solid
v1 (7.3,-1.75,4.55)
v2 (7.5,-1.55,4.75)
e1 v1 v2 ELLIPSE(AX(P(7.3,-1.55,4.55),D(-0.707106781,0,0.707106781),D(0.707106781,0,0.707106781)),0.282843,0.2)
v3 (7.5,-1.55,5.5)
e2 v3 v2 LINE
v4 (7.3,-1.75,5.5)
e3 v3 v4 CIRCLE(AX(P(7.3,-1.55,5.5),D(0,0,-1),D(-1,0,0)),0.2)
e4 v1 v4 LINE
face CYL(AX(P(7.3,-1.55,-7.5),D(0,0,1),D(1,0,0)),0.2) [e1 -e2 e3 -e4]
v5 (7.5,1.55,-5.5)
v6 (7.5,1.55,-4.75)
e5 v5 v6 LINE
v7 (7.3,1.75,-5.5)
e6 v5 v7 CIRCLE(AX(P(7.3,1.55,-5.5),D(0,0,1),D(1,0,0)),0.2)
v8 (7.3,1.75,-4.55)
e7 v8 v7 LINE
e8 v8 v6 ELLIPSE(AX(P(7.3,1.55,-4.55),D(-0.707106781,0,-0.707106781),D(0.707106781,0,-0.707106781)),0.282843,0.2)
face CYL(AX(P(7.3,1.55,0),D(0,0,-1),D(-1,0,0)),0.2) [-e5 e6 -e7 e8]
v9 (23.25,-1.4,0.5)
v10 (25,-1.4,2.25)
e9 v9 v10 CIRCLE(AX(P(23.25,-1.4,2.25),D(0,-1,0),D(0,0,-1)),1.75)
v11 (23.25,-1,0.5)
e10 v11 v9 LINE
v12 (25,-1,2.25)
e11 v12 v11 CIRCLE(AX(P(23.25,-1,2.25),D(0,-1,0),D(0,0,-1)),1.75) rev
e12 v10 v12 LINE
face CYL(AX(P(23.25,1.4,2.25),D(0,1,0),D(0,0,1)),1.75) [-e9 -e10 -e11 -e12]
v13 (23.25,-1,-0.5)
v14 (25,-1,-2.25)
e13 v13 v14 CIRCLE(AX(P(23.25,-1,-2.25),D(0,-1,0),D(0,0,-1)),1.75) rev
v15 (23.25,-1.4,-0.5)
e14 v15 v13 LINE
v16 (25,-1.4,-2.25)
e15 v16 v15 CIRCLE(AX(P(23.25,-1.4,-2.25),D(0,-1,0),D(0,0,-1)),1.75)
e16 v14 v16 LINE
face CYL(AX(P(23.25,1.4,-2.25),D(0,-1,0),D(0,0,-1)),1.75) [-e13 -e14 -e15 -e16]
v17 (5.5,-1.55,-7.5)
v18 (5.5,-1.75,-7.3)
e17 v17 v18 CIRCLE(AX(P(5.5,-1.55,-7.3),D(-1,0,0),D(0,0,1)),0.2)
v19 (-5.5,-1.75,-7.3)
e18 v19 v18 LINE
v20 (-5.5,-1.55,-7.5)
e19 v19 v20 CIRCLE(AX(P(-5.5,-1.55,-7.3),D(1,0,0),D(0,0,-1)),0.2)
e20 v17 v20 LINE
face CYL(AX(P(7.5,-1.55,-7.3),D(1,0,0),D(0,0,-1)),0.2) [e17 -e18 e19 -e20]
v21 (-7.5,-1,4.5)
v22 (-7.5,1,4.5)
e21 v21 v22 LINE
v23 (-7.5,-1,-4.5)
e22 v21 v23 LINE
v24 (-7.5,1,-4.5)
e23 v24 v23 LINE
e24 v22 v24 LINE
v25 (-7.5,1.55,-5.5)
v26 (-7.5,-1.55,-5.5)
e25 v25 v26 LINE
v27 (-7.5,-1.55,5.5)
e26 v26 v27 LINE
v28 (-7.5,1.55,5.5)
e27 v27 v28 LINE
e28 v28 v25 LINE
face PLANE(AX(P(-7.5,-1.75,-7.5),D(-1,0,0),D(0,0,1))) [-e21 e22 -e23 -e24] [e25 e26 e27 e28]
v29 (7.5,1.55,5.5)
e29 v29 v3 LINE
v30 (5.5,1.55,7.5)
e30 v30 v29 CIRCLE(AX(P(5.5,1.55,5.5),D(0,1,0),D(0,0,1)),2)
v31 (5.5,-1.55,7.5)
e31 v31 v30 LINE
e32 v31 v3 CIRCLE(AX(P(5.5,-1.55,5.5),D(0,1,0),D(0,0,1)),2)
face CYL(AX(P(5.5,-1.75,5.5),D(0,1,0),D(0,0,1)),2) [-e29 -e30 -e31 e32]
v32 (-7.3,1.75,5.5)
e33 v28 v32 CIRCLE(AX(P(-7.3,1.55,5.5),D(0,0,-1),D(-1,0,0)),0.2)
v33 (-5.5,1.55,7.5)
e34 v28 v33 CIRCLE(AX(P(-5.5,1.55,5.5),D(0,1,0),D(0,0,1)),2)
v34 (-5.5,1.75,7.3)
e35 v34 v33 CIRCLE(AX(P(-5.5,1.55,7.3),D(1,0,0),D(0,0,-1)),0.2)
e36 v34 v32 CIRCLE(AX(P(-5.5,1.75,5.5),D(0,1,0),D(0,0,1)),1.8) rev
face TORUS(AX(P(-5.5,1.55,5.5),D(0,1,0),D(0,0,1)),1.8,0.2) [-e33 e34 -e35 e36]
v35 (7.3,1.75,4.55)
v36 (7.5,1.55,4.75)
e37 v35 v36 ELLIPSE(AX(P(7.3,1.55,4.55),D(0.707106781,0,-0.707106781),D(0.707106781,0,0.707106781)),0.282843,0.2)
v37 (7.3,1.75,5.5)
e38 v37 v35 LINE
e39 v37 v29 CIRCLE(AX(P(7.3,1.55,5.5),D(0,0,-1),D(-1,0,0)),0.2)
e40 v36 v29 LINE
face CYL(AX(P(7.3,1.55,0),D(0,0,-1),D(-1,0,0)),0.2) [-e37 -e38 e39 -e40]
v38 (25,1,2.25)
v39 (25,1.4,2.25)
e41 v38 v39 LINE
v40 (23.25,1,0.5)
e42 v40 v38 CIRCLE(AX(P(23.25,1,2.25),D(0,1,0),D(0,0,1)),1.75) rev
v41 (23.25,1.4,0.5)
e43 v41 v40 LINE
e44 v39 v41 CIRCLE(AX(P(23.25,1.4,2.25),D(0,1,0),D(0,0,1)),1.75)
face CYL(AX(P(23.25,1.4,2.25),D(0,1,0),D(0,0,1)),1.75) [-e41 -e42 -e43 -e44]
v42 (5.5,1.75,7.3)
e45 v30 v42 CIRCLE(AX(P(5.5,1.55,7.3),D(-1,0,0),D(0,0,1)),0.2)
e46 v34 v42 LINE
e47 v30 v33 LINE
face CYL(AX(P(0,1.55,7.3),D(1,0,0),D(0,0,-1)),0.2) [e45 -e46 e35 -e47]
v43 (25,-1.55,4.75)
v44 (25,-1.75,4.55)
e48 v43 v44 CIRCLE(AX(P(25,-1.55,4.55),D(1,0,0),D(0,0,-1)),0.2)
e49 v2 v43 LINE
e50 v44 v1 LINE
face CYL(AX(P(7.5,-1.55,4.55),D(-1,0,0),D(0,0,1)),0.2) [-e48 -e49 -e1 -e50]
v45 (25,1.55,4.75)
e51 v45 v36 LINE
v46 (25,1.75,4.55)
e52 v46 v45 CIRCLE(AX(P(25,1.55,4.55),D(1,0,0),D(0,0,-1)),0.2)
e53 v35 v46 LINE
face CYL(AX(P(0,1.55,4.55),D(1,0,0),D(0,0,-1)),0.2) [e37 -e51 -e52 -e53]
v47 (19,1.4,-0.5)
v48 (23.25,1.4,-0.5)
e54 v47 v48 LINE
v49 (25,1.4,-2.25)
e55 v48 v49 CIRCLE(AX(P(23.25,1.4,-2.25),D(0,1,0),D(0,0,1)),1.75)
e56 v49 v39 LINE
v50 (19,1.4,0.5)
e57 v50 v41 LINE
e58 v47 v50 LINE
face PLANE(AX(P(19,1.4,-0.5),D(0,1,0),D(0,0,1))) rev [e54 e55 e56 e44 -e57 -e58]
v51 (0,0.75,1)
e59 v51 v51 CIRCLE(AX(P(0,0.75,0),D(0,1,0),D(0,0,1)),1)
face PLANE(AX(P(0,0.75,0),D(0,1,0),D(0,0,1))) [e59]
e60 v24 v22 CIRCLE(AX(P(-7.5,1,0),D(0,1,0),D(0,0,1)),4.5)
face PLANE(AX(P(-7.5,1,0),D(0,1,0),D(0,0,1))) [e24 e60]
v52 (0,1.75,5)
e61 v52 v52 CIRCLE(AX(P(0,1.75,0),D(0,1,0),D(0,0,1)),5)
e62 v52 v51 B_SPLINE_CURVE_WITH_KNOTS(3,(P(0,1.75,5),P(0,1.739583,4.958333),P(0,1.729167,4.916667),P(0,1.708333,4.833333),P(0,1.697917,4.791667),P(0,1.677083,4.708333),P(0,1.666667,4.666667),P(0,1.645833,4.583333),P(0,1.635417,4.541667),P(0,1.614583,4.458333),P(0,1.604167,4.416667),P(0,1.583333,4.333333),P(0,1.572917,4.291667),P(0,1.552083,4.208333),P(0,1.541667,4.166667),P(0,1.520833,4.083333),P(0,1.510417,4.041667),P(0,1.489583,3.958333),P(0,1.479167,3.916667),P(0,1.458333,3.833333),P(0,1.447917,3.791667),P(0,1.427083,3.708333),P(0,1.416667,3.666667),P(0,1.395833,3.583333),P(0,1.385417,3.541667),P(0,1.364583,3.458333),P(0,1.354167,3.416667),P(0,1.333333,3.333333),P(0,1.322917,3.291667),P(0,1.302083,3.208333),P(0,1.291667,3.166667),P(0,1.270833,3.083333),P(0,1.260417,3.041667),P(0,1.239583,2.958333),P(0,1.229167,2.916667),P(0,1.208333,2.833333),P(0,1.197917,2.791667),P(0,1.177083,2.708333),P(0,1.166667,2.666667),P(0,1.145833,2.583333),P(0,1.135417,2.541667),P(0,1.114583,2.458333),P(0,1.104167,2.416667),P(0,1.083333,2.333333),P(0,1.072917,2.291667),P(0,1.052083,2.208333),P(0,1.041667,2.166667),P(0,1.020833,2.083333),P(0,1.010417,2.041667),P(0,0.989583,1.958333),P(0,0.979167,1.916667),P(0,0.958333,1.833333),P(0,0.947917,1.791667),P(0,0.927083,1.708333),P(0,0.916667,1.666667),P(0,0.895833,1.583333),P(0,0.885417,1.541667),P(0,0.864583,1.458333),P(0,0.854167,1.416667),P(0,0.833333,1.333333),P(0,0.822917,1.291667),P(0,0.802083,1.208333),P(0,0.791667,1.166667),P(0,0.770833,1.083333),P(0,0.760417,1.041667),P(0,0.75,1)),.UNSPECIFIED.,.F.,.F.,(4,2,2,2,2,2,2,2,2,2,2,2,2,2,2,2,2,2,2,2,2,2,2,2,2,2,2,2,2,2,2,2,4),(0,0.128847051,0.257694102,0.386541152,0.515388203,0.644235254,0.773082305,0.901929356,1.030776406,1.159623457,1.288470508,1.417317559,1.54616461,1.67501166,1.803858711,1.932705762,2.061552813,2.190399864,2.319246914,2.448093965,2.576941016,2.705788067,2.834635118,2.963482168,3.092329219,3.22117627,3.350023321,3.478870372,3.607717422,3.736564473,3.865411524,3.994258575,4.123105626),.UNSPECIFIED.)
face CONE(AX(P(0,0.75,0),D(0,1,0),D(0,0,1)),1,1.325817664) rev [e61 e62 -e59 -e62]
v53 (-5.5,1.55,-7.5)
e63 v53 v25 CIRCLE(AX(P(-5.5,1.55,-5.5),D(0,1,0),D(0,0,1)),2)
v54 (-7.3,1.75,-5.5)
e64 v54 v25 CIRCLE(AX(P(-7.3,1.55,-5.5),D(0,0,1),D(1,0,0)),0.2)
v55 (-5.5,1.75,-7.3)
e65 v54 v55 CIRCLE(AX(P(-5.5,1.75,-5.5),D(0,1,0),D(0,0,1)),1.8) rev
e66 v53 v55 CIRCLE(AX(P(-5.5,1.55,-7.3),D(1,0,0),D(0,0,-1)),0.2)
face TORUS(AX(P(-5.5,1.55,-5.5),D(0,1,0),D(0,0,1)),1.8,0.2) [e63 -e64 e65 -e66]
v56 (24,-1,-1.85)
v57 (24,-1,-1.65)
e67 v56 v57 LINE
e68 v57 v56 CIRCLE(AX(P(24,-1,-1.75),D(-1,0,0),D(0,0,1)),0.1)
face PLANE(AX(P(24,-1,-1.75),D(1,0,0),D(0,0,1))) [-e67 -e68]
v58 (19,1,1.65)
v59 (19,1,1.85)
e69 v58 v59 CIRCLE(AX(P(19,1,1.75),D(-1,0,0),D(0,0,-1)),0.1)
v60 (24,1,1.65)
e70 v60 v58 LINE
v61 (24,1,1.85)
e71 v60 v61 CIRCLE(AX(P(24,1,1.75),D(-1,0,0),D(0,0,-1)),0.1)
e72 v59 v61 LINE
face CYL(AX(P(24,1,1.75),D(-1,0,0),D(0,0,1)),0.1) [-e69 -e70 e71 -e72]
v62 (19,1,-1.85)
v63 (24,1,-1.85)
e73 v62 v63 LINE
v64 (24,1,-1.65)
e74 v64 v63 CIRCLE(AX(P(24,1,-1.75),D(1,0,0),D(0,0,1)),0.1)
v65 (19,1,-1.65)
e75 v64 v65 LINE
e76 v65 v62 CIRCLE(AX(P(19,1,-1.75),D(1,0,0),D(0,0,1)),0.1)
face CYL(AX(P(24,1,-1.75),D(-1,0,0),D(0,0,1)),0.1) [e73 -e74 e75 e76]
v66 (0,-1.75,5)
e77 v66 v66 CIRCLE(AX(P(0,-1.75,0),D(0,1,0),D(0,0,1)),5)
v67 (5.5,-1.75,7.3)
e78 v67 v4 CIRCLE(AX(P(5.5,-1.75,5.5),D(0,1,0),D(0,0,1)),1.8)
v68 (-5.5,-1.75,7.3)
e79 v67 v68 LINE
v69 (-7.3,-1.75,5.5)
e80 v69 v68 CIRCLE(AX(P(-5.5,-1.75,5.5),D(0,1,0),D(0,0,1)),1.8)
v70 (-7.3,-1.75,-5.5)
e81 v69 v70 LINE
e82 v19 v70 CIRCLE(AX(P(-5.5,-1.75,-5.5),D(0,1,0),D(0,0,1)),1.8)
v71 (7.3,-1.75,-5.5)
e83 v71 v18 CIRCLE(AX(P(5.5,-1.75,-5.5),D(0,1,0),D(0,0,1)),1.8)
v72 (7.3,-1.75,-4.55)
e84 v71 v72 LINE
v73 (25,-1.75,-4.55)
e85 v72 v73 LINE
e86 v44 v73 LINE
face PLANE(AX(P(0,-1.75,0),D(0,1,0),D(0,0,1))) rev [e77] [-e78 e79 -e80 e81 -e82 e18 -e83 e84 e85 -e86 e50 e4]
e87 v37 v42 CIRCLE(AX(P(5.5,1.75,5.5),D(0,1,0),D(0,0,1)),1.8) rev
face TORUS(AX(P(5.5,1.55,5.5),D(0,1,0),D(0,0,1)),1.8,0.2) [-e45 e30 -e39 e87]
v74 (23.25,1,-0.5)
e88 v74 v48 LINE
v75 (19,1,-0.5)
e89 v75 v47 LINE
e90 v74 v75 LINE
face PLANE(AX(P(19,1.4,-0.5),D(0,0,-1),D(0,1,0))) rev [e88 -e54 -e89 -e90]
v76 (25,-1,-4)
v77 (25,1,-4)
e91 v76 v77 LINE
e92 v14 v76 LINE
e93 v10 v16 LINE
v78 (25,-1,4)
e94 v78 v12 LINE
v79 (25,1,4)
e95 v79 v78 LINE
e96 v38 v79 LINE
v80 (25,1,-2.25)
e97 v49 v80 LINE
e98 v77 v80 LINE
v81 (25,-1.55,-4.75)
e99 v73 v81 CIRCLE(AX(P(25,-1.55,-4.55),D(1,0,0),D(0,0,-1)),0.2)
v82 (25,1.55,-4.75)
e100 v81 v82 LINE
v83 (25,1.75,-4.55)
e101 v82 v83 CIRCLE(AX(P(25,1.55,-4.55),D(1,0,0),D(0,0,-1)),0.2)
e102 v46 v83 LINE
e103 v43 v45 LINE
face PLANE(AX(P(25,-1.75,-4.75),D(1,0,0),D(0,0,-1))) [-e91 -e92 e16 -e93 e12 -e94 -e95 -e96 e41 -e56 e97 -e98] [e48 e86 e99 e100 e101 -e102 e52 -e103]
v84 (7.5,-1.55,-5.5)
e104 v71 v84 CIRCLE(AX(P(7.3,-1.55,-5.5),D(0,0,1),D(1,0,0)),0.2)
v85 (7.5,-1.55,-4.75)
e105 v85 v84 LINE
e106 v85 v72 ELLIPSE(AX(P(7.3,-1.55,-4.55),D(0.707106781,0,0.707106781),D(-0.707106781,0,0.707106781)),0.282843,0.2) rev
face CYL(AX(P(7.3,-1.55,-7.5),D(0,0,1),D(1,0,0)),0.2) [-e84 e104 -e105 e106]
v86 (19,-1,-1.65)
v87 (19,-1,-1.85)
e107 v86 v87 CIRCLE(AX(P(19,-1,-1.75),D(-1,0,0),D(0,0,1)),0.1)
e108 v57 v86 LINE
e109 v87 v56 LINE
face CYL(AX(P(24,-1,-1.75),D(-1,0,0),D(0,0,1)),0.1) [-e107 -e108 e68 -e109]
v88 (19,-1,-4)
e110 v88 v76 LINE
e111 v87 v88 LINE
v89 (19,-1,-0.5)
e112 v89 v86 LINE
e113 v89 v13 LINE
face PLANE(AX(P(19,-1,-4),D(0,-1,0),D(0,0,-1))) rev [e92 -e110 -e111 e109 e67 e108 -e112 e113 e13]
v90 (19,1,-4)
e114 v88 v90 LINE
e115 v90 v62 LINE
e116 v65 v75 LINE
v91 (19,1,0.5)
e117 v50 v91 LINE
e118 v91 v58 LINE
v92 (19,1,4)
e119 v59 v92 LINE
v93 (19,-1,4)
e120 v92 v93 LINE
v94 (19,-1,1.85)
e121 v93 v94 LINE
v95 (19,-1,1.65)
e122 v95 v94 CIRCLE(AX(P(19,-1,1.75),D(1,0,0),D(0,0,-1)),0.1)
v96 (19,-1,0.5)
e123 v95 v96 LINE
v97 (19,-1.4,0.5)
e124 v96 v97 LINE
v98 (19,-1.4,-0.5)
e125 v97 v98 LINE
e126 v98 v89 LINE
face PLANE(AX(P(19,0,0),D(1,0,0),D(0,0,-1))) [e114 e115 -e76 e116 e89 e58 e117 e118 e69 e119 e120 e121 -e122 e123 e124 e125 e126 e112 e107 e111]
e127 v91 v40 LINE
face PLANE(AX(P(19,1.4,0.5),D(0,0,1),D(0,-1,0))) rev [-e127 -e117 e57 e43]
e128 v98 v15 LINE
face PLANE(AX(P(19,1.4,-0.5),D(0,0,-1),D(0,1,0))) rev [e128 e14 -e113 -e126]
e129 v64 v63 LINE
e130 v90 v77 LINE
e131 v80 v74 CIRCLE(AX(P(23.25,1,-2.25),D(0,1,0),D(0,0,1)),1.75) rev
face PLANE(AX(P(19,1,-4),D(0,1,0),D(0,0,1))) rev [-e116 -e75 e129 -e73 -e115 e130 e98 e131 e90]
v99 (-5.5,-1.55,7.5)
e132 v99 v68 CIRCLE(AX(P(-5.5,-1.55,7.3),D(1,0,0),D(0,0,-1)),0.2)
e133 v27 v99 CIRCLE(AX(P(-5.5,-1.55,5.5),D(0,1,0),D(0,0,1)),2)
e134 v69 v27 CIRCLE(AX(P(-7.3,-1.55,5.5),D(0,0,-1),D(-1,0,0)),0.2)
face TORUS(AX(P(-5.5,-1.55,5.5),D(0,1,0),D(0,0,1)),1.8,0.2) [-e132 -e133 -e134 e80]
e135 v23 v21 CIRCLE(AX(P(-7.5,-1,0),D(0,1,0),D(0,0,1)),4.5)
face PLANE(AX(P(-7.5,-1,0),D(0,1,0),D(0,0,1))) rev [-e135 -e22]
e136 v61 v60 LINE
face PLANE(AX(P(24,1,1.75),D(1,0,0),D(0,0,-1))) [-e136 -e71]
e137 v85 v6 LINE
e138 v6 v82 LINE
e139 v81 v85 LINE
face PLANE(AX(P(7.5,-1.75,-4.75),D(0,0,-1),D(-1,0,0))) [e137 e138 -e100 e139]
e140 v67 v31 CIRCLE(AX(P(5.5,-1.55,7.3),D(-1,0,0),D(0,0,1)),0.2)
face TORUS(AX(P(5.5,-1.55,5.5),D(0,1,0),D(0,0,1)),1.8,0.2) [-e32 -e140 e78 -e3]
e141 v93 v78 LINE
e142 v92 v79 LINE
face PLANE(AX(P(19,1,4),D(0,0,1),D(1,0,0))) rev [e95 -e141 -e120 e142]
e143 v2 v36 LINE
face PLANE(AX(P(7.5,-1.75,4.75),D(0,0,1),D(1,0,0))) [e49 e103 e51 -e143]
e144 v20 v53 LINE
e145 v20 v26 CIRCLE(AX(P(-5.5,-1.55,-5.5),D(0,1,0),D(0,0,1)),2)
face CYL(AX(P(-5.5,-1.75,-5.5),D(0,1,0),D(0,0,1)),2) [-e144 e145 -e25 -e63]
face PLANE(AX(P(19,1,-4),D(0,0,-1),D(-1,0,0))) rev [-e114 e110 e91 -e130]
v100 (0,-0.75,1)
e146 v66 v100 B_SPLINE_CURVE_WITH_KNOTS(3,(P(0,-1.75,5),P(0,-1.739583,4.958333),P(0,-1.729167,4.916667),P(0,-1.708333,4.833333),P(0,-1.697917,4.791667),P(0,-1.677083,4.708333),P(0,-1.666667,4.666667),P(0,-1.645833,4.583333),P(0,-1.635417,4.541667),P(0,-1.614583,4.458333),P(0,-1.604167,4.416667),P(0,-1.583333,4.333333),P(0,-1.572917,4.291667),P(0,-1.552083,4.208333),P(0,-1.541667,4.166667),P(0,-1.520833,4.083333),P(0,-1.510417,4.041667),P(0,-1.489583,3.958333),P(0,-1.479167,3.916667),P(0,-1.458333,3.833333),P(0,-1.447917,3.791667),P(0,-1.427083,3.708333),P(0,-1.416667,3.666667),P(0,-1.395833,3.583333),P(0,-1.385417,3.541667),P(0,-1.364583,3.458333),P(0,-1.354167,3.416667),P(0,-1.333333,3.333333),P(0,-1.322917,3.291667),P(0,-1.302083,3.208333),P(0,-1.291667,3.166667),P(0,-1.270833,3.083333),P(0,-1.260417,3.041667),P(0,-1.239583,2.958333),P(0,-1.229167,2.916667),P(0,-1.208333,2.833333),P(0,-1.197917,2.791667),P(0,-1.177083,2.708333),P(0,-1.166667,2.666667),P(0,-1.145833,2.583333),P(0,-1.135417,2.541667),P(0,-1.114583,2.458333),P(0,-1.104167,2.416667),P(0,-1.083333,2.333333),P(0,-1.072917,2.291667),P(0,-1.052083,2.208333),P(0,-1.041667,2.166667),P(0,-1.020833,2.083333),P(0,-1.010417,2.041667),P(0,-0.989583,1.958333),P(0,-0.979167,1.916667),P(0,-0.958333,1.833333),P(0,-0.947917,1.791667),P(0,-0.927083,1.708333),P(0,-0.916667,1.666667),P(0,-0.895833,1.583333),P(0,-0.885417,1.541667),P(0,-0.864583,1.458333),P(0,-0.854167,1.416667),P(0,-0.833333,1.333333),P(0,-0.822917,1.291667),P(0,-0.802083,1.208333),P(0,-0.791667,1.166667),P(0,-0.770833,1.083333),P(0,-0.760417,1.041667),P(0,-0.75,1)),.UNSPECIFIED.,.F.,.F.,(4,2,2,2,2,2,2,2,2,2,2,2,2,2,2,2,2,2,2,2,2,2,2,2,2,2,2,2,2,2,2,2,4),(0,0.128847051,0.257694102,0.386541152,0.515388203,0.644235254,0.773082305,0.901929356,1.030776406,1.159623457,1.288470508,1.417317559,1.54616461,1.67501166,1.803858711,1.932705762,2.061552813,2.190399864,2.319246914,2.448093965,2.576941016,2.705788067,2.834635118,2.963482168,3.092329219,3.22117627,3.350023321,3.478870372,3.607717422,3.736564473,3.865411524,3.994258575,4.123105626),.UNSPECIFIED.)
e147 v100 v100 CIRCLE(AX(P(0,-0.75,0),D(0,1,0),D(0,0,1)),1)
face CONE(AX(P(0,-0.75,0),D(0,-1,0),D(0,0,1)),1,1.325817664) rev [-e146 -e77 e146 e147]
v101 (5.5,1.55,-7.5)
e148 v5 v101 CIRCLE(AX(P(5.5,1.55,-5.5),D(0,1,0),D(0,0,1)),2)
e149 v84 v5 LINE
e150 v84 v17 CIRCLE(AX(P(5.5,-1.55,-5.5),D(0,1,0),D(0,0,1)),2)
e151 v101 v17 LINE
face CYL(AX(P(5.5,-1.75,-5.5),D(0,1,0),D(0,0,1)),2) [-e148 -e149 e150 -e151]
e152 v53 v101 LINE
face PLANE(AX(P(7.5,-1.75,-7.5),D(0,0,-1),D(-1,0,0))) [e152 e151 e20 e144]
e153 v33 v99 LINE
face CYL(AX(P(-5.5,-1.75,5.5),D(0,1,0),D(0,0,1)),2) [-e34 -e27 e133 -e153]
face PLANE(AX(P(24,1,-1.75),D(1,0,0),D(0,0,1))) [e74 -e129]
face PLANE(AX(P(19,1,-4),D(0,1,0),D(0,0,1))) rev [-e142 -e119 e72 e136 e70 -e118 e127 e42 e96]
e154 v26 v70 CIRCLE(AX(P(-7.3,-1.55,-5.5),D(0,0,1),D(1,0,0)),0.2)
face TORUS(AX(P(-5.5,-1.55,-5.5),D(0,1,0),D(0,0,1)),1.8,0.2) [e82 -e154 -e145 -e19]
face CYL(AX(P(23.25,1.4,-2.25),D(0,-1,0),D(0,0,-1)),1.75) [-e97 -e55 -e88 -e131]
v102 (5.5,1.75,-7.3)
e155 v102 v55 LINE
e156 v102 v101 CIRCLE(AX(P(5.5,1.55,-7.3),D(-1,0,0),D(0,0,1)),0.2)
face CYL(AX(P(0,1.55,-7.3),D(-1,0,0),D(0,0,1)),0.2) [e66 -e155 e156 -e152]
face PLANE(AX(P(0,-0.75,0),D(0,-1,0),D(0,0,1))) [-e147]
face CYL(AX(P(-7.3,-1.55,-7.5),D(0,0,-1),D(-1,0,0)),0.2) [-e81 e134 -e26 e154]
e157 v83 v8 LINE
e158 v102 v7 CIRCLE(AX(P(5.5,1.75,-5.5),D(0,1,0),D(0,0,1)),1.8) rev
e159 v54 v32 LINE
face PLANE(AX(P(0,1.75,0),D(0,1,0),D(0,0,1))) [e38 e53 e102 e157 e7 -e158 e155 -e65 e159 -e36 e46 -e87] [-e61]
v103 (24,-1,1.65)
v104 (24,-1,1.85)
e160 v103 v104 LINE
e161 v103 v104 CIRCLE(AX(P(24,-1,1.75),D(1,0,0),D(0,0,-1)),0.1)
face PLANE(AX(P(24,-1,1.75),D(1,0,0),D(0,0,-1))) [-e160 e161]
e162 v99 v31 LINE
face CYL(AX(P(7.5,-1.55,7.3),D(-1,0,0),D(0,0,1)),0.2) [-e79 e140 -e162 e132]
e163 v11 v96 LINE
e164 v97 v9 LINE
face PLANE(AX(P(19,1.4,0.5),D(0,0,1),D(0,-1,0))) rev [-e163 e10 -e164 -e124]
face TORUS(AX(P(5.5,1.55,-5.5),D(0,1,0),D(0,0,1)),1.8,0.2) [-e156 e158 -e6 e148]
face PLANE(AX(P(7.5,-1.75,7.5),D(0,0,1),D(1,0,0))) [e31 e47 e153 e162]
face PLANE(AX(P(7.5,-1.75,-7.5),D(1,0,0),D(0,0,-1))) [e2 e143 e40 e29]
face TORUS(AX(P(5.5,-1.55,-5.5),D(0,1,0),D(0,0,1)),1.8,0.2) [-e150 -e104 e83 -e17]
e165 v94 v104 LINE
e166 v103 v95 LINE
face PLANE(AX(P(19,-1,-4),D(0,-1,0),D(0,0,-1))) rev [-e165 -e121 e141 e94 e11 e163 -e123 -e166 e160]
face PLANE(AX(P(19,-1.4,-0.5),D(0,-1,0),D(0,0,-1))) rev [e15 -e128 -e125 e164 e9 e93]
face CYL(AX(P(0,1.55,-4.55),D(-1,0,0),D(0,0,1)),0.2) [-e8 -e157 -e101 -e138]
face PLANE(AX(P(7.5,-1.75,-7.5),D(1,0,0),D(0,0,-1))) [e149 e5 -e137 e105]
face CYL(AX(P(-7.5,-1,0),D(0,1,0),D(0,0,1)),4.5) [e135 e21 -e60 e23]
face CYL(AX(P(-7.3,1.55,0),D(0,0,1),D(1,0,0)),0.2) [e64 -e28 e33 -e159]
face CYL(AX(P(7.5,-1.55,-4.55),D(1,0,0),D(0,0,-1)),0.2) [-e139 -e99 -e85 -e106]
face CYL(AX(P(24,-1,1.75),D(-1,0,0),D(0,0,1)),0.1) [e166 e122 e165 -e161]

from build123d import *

# Parameters (mm, degrees)
EXTRUDE_1_DEPTH          = 1.75
EXTRUDE_1_DEPTH_BACK     = 1.75
SKETCH_1_W               = 15
SKETCH_1_H               = 15
EXTRUDE_2_DEPTH          = 1
EXTRUDE_2_DEPTH_BACK     = 1
SKETCH_2_R               = 4.5
EXTRUDE_3_DEPTH          = 1.75
EXTRUDE_3_DEPTH_BACK     = 1.75
SKETCH_3_W               = 17.5
SKETCH_3_H               = 9.5
SKETCH_4_R               = 5
SKETCH_5_R               = 1
SKETCH_6_W               = 8
SKETCH_6_H               = 2
CUT_EXTRUDE_1_DEPTH      = 6
SKETCH_7_W               = 1
SKETCH_7_H               = 2.8
CUT_EXTRUDE_2_DEPTH      = 6
SKETCH_8_R               = 0.1
EXTRUDE_4_DEPTH          = 5
MIRROR_3_COPY_1_SKETCH_R = 0.1
MIRROR_3_COPY_1_DEPTH    = 5
FILLET_1_R               = 1.75
FILLET_2_R               = 0.2
FILLET_3_R               = 2


with BuildPart() as part:
    # 草图1 → 凸台-拉伸1 (new, two sides: drawn at the far end of the back side and taken through both)
    with BuildSketch(Plane(origin=(0, 0, 0), x_dir=(1, 0, 0), z_dir=(0, 1, 0)).offset(-EXTRUDE_1_DEPTH_BACK)):
        Rectangle(SKETCH_1_W, SKETCH_1_H)
    extrude(amount=EXTRUDE_1_DEPTH + EXTRUDE_1_DEPTH_BACK)

    # 草图2 → 凸台-拉伸2 (add, two sides: drawn at the far end of the back side and taken through both)
    with BuildSketch(Plane(origin=(0, 0, 0), x_dir=(1, 0, 0), z_dir=(0, 1, 0)).offset(-EXTRUDE_2_DEPTH_BACK)):
        with Locations((-7.5, 0)):
            Circle(SKETCH_2_R)
    extrude(amount=EXTRUDE_2_DEPTH + EXTRUDE_2_DEPTH_BACK)

    # 草图3 → 凸台-拉伸3 (add, two sides: drawn at the far end of the back side and taken through both)
    with BuildSketch(Plane(origin=(0, 0, 0), x_dir=(1, 0, 0), z_dir=(0, 1, 0)).offset(-EXTRUDE_3_DEPTH_BACK)):
        with Locations((16.25, 0)):
            Rectangle(SKETCH_3_W, SKETCH_3_H)
    extrude(amount=EXTRUDE_3_DEPTH + EXTRUDE_3_DEPTH_BACK)

    # 草图4 → 切除-放样1 section 0
    with BuildSketch(Plane(origin=(0, 1.75, 0), x_dir=(1, 0, 0), z_dir=(0, 1, 0))):
        Circle(SKETCH_4_R)
    # 草图5 → 切除-放样1 section 1
    with BuildSketch(Plane(origin=(0, 0.75, 0), x_dir=(1, 0, 0), z_dir=(0, 1, 0))):
        Circle(SKETCH_5_R)
    loft_1 = loft(mode=Mode.SUBTRACT)

    # 镜向1: 切除-放样1 across plane
    add(loft_1.mirror(Plane.ZX), mode=Mode.SUBTRACT)

    # 草图6 → 切除-拉伸1 (cut)
    with BuildSketch(Plane(origin=(25, 0, 0), x_dir=(0, 0, -1), z_dir=(1, 0, 0))):
        Rectangle(SKETCH_6_W, SKETCH_6_H)
    extrude(amount=-CUT_EXTRUDE_1_DEPTH, mode=Mode.SUBTRACT)

    # 草图7 → 切除-拉伸2 (cut)
    with BuildSketch(Plane(origin=(25, 0, 0), x_dir=(0, 0, -1), z_dir=(1, 0, 0))):
        Rectangle(SKETCH_7_W, SKETCH_7_H)
    extrude(amount=-CUT_EXTRUDE_2_DEPTH, mode=Mode.SUBTRACT)

    # 草图8 → 凸台-拉伸4 (add)
    with BuildSketch(Plane(origin=(19, 0, 0), x_dir=(0, 0, -1), z_dir=(1, 0, 0))):
        with Locations((-1.75, -1)):
            Circle(SKETCH_8_R)
    extrude_4 = extrude(amount=EXTRUDE_4_DEPTH)

    # 镜向2: 凸台-拉伸4 across plane
    add(extrude_4.mirror(Plane.XY))

    # 镜向3: 凸台-拉伸4 across plane
    add(extrude_4.mirror(Plane.ZX))

    # 镜向3 copy 1 sketch → 镜向3 copy 1 (add)
    with BuildSketch(Plane(origin=(19, 0, 0), x_dir=(0, 0, 1), z_dir=(1, 0, 0))):
        with Locations((-1.75, -1)):
            Circle(MIRROR_3_COPY_1_SKETCH_R)
    extrude(amount=MIRROR_3_COPY_1_DEPTH)

    # 圆角1
    fillet_1_edges = [part.edges().sort_by_distance(p)[0] for p in [
        (25, 1.2, 0.5),
        (25, 1.2, -0.5),
        (25, -1.2, -0.5),
        (25, -1.2, 0.5),
    ]]
    fillet(fillet_1_edges, radius=FILLET_1_R)

    # 圆角2
    fillet_2_edges = [part.edges().sort_by_distance(p)[0] for p in [
        (-7.5, -1.75, 0),
        (0, -1.75, 7.5),
        (0, -1.75, -7.5),
        (7.5, -1.75, -6.125),
        (7.5, -1.75, 6.125),
        (16.25, 1.75, 4.75),
        (16.25, -1.75, 4.75),
        (16.25, 1.75, -4.75),
        (16.25, -1.75, -4.75),
        (7.5, 1.75, 6.125),
        (7.5, 1.75, -6.125),
        (0, 1.75, -7.5),
        (0, 1.75, 7.5),
        (-7.5, 1.75, 0),
    ]]
    fillet(fillet_2_edges, radius=FILLET_2_R)

    # 圆角3
    # the kernel refuses this fillet: 2 mm, written as the material it takes off along each edge
    with BuildSketch(Plane(origin=(5.5, -1.75, -5.5), x_dir=(0, 0, -1), z_dir=(-1, 0, 0))) as fillet_3_piece_1:
        with BuildLine():
            CenterArc((1.8, -0.2), 0.2, 0, 90)
            Line((2, -0.2), (2, 0))
            Line((2, 0), (1.8, 0))
        make_face()
    revolve(axis=Axis((5.5, -1.75, -5.5), (0, -1, 0)), revolution_arc=90, mode=Mode.SUBTRACT)
    with BuildSketch(Plane(origin=(5.5, -1.75, 5.5), x_dir=(1, 0, 0), z_dir=(0, 0, -1))) as fillet_3_piece_2:
        with BuildLine():
            CenterArc((1.8, -0.2), 0.2, 0, 90)
            Line((2, -0.2), (2, 0))
            Line((2, 0), (1.8, 0))
        make_face()
    revolve(axis=Axis((5.5, -1.75, 5.5), (0, -1, 0)), revolution_arc=90, mode=Mode.SUBTRACT)
    with BuildSketch(Plane(origin=(-5.5, -1.75, -5.5), x_dir=(-1, 0, 0), z_dir=(0, 0, 1))) as fillet_3_piece_3:
        with BuildLine():
            CenterArc((1.8, -0.2), 0.2, 0, 90)
            Line((2, -0.2), (2, 0))
            Line((2, 0), (1.8, 0))
        make_face()
    revolve(axis=Axis((-5.5, -1.75, -5.5), (0, -1, 0)), revolution_arc=90, mode=Mode.SUBTRACT)
    with BuildSketch(Plane(origin=(-5.5, -1.75, 5.5), x_dir=(0, 0, 1), z_dir=(1, 0, 0))) as fillet_3_piece_4:
        with BuildLine():
            CenterArc((1.8, -0.2), 0.2, 0, 90)
            Line((2, -0.2), (2, 0))
            Line((2, 0), (1.8, 0))
        make_face()
    revolve(axis=Axis((-5.5, -1.75, 5.5), (0, -1, 0)), revolution_arc=90, mode=Mode.SUBTRACT)
    with BuildSketch(Plane(origin=(5.5, 1.75, -5.5), x_dir=(1, 0, 0), z_dir=(0, 0, 1))) as fillet_3_piece_5:
        with BuildLine():
            CenterArc((1.8, -0.2), 0.2, 0, 90)
            Line((2, -0.2), (2, 0))
            Line((2, 0), (1.8, 0))
        make_face()
    revolve(axis=Axis((5.5, 1.75, -5.5), (0, 1, 0)), revolution_arc=90, mode=Mode.SUBTRACT)
    with BuildSketch(Plane(origin=(-5.5, 1.75, -5.5), x_dir=(0, 0, -1), z_dir=(1, 0, 0))) as fillet_3_piece_6:
        with BuildLine():
            CenterArc((1.8, -0.2), 0.2, 0, 90)
            Line((2, -0.2), (2, 0))
            Line((2, 0), (1.8, 0))
        make_face()
    revolve(axis=Axis((-5.5, 1.75, -5.5), (0, 1, 0)), revolution_arc=90, mode=Mode.SUBTRACT)
    with BuildSketch(Plane(origin=(-5.5, 1.75, 5.5), x_dir=(-1, 0, 0), z_dir=(0, 0, -1))) as fillet_3_piece_7:
        with BuildLine():
            CenterArc((1.8, -0.2), 0.2, 0, 90)
            Line((2, -0.2), (2, 0))
            Line((2, 0), (1.8, 0))
        make_face()
    revolve(axis=Axis((-5.5, 1.75, 5.5), (0, 1, 0)), revolution_arc=90, mode=Mode.SUBTRACT)
    with BuildSketch(Plane(origin=(5.5, 1.75, 5.5), x_dir=(0, 0, 1), z_dir=(-1, 0, 0))) as fillet_3_piece_8:
        with BuildLine():
            CenterArc((1.8, -0.2), 0.2, 0, 90)
            Line((2, -0.2), (2, 0))
            Line((2, 0), (1.8, 0))
        make_face()
    revolve(axis=Axis((5.5, 1.75, 5.5), (0, 1, 0)), revolution_arc=90, mode=Mode.SUBTRACT)
    with BuildSketch(Plane(origin=(-7.5, 1.75, 7.5), x_dir=(1, 0, 0), z_dir=(0, -1, 0)), Plane(origin=(-7.5, -1.75, -7.5), x_dir=(1, 0, 0), z_dir=(0, 1, 0)), Plane(origin=(7.5, 1.75, 7.5), x_dir=(0, 0, -1), z_dir=(0, -1, 0)), Plane(origin=(7.5, -1.75, -7.5), x_dir=(0, 0, 1), z_dir=(0, 1, 0))) as fillet_3_piece_9:
        with BuildLine():
            CenterArc((FILLET_3_R, -FILLET_3_R), FILLET_3_R, 90, 90)
            Line((0, -FILLET_3_R), (0, 0))
            Line((0, 0), (FILLET_3_R, 0))
        make_face()
    extrude(amount=3.5, mode=Mode.SUBTRACT)


solid = part.part
